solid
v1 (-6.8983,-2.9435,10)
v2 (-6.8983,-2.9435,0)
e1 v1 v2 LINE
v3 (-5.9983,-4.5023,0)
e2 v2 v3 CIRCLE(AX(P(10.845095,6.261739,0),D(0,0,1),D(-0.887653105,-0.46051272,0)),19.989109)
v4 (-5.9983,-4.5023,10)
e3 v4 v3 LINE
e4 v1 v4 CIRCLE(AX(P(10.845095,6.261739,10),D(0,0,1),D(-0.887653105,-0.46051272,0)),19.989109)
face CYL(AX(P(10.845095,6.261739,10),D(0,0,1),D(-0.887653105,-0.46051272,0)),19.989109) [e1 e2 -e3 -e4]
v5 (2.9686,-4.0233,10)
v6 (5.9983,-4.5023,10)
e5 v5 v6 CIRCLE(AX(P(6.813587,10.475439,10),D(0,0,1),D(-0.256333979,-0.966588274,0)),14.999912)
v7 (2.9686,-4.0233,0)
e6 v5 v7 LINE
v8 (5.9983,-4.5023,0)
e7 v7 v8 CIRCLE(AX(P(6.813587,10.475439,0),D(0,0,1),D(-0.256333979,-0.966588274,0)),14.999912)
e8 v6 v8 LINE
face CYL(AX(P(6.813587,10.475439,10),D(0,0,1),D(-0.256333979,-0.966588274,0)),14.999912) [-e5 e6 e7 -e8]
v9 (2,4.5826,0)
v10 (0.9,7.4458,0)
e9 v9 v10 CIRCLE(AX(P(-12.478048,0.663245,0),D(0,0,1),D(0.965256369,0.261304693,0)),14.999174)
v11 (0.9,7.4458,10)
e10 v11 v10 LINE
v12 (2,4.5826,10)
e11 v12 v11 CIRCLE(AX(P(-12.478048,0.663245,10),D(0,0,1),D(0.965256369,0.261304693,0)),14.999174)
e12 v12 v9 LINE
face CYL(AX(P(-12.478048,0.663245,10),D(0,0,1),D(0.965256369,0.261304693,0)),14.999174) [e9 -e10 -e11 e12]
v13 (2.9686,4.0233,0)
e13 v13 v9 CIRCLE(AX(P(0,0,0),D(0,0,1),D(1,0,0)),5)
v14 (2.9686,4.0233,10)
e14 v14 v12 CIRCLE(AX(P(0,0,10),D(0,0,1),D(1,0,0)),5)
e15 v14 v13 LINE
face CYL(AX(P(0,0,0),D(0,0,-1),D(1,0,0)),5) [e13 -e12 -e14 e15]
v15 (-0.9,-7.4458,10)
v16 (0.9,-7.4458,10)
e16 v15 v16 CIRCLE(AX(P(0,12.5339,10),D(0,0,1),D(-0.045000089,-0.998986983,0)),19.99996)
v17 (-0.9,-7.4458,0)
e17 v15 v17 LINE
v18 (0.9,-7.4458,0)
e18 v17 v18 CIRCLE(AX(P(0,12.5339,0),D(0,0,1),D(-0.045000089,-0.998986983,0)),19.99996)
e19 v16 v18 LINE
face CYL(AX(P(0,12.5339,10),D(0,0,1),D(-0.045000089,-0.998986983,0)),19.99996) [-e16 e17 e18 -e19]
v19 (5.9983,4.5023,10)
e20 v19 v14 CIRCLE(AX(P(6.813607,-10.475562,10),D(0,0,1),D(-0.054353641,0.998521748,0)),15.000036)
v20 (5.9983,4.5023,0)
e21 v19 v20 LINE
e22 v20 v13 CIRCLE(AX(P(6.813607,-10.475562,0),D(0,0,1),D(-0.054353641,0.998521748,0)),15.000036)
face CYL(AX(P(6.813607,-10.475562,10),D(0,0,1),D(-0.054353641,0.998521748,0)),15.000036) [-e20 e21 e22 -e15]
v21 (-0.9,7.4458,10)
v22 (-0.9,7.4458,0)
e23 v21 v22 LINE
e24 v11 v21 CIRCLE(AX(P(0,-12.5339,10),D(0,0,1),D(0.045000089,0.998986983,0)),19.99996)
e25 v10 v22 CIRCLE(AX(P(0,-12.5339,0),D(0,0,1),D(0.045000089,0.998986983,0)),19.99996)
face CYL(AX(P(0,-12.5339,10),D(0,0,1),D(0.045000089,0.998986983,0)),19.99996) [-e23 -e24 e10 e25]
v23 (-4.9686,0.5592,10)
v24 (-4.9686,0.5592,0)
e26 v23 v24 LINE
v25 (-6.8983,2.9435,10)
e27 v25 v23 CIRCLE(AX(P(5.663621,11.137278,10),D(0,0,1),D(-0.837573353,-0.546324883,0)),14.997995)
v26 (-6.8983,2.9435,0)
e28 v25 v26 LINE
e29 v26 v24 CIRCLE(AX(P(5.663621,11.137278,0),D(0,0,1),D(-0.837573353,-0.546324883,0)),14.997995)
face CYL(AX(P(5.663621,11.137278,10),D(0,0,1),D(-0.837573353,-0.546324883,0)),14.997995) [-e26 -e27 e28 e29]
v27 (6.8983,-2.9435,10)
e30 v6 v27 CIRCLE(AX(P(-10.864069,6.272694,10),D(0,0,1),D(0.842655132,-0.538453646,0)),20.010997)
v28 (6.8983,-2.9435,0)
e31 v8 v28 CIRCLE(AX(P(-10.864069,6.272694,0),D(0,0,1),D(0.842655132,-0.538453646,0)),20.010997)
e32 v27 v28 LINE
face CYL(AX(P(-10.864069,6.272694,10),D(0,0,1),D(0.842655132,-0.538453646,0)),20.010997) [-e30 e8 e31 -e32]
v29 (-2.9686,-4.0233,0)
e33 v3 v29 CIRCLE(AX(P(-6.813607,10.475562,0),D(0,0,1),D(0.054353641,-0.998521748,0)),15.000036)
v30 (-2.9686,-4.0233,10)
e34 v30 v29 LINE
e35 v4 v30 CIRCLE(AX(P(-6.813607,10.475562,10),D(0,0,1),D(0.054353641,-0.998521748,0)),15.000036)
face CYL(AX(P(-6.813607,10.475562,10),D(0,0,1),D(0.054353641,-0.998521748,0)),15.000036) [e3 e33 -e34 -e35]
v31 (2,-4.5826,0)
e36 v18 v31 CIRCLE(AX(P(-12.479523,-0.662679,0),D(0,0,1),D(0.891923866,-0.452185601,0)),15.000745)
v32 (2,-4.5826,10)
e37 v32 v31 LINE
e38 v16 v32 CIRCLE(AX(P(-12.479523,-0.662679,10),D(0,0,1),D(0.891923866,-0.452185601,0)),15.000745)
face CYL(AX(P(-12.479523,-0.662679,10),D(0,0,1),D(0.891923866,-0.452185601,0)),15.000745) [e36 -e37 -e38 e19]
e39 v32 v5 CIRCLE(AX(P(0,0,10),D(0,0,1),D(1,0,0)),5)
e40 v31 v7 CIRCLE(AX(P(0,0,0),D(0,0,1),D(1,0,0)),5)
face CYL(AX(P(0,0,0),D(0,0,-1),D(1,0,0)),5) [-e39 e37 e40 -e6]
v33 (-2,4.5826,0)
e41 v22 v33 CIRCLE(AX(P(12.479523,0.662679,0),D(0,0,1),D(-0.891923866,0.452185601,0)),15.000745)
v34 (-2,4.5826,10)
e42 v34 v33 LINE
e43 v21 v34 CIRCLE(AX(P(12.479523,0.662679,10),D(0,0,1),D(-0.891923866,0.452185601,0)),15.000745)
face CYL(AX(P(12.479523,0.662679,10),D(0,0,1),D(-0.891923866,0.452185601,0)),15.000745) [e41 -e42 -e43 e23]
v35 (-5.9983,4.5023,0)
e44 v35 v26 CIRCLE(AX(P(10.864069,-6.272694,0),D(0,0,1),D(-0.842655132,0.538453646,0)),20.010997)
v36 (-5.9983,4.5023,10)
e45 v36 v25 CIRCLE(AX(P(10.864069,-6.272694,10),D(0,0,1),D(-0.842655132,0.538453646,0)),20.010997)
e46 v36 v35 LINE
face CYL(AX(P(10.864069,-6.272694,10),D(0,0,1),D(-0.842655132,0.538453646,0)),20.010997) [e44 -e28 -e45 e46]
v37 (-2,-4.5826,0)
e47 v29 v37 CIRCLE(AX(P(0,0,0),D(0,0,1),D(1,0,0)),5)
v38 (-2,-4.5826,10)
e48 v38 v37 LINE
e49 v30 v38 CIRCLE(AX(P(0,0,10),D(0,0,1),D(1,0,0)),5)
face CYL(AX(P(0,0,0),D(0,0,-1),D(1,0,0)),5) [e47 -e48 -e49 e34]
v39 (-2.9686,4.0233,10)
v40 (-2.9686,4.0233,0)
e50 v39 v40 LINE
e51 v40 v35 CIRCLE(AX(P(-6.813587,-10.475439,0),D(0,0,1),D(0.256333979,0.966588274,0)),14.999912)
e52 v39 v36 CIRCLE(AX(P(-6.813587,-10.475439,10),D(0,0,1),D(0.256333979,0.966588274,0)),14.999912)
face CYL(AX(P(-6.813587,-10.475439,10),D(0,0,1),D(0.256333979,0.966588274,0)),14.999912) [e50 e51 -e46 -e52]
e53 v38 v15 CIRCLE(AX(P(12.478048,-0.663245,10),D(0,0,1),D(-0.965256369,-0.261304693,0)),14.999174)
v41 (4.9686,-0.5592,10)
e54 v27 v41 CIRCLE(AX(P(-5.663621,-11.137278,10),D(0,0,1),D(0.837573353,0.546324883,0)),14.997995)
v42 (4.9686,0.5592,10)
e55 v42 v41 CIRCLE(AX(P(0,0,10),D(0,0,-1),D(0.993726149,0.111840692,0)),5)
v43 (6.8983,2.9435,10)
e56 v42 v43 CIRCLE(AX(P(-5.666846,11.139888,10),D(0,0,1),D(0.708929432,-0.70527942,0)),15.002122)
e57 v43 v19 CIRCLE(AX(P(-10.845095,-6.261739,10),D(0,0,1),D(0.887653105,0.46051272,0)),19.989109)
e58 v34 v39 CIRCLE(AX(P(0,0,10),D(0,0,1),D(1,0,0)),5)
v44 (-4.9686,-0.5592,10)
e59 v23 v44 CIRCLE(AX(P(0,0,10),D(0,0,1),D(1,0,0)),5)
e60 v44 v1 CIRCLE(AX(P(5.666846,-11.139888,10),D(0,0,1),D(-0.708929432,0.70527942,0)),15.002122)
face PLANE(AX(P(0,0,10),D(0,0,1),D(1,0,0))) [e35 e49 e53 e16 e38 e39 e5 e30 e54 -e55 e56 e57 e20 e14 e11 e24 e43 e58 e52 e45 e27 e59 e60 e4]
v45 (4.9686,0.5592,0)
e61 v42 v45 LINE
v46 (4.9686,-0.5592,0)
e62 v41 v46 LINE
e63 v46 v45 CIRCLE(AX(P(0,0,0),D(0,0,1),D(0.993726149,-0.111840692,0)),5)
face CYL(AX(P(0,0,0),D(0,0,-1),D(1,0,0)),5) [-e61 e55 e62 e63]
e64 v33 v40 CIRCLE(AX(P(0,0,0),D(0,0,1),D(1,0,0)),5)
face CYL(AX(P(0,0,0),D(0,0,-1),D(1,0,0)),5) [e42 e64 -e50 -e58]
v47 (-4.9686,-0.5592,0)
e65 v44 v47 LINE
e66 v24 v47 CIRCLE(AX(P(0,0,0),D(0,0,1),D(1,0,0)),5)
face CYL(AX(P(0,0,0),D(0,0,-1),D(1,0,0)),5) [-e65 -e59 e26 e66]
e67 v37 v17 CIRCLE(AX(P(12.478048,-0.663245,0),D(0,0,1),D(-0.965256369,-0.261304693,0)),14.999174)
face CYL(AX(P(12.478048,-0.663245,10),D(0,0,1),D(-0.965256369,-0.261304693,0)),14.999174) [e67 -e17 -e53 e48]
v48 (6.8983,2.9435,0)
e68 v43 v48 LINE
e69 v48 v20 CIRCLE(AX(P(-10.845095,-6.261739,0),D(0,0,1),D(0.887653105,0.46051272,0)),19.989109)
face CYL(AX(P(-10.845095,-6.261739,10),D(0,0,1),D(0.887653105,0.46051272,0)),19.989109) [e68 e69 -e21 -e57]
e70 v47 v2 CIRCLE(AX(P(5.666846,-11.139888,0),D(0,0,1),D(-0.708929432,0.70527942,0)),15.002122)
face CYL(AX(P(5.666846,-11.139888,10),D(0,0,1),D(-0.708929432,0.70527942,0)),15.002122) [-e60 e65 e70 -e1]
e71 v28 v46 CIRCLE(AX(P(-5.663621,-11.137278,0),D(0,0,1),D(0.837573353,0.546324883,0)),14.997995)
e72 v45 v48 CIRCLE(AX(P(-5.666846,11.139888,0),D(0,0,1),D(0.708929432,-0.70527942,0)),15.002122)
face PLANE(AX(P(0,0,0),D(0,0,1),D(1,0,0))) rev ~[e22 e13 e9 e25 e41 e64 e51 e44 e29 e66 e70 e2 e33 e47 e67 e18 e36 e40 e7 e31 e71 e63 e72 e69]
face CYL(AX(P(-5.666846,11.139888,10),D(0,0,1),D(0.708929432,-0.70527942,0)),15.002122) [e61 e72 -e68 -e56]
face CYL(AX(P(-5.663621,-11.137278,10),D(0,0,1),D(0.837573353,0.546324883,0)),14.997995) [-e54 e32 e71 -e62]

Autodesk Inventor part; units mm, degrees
ref_plane "YZ Plane" through (0, 0, 0) normal (1, 0, 0) x (0, 1, 0)
ref_plane "XZ Plane" through (0, 0, 0) normal (0, 1, 0) x (-1, 0, 0)
ref_plane "XY Plane" through (0, 0, 0) normal (0, 0, 1) x (1, 0, 0)
sketch "Sketch1" plane through (0, 0, 0) normal (0, 0, 1) x (1, 0, 0)
  circle A0 centre (0, 0) radius 5
  dimension "d0" = 10
extrude "Extrusion1" add sketch "Sketch1" along normal blind 10
sketch "Sketch3" plane through (0, 0, 10) normal (0, 0, 1) x (1, 0, 0)
  circle A0 centre (0, 0) radius 5 construction
  arc A1 (-2, -4.5826) -> (-0.9, -7.4458) centre (12.4788, -0.663) ccw
  arc A2 (0.9, -7.4458) -> (2, -4.5826) centre (-12.4788, -0.663) ccw
  arc A3 (-2, -4.5826) -> (2, -4.5826) centre (0, 0) ccw
  arc A4 (-0.9, -7.4458) -> (0.9, -7.4458) centre (0, 12.5339) ccw
  circle A5 centre (0, 0) radius 7.5 construction
  line L0 (0, 0) -> (0, -8.6797) construction
  arc A6 (2.9686, -4.0233) -> (5.9983, -4.5023) centre (6.8136, 10.4755) ccw
  arc A7 (2.9686, -4.0233) -> (4.9686, -0.5592) centre (0, 0) ccw
  arc A8 (6.8983, -2.9435) -> (4.9686, -0.5592) centre (-5.6653, -11.1385) ccw
  arc A9 (5.9983, -4.5023) -> (6.8983, -2.9435) centre (-10.8547, 6.267) ccw
  arc A10 (4.9686, 0.5592) -> (6.8983, 2.9435) centre (-5.6653, 11.1385) ccw
  arc A11 (4.9686, 0.5592) -> (2.9686, 4.0233) centre (0, 0) ccw
  arc A12 (5.9983, 4.5023) -> (2.9686, 4.0233) centre (6.8136, -10.4755) ccw
  arc A13 (6.8983, 2.9435) -> (5.9983, 4.5023) centre (-10.8547, -6.267) ccw
  arc A14 (2, 4.5826) -> (0.9, 7.4458) centre (-12.4788, 0.663) ccw
  arc A15 (2, 4.5826) -> (-2, 4.5826) centre (0, 0) ccw
  arc A16 (-0.9, 7.4458) -> (-2, 4.5826) centre (12.4788, 0.663) ccw
  arc A17 (0.9, 7.4458) -> (-0.9, 7.4458) centre (0, -12.5339) ccw
  arc A18 (-2.9686, 4.0233) -> (-5.9983, 4.5023) centre (-6.8136, -10.4755) ccw
  arc A19 (-2.9686, 4.0233) -> (-4.9686, 0.5592) centre (0, 0) ccw
  arc A20 (-6.8983, 2.9435) -> (-4.9686, 0.5592) centre (5.6653, 11.1385) ccw
  arc A21 (-5.9983, 4.5023) -> (-6.8983, 2.9435) centre (10.8547, -6.267) ccw
  arc A22 (-4.9686, -0.5592) -> (-6.8983, -2.9435) centre (5.6653, -11.1385) ccw
  arc A23 (-4.9686, -0.5592) -> (-2.9686, -4.0233) centre (0, 0) ccw
  arc A24 (-5.9983, -4.5023) -> (-2.9686, -4.0233) centre (-6.8136, 10.4755) ccw
  arc A25 (-6.8983, -2.9435) -> (-5.9983, -4.5023) centre (10.8547, 6.267) ccw
  point P0 (0, -7.4661)
  point P1 (0, -5)
  point P2 (4.3301, -2.5)
  point P3 (6.4658, -3.733)
  point P4 (4.3301, 2.5)
  point P5 (6.4658, 3.733)
  point P6 (0, 5)
  point P7 (0, 7.4661)
  point P8 (-4.3301, 2.5)
  point P9 (-6.4658, 3.733)
  point P10 (-4.3301, -2.5)
  point P11 (-6.4658, -3.733)
  dimension "d12" = 15
  dimension "d13" = 15
  dimension "d14" = 1.8
  dimension "d15" = 4
  dimension "d16" = 20
  dimension "d17" = 15
  dimension "d20" = 360
extrude "Extrusion2" add sketch "Sketch3" against normal blind 10
properties part number "SJ012" material "ABS Plastic"
